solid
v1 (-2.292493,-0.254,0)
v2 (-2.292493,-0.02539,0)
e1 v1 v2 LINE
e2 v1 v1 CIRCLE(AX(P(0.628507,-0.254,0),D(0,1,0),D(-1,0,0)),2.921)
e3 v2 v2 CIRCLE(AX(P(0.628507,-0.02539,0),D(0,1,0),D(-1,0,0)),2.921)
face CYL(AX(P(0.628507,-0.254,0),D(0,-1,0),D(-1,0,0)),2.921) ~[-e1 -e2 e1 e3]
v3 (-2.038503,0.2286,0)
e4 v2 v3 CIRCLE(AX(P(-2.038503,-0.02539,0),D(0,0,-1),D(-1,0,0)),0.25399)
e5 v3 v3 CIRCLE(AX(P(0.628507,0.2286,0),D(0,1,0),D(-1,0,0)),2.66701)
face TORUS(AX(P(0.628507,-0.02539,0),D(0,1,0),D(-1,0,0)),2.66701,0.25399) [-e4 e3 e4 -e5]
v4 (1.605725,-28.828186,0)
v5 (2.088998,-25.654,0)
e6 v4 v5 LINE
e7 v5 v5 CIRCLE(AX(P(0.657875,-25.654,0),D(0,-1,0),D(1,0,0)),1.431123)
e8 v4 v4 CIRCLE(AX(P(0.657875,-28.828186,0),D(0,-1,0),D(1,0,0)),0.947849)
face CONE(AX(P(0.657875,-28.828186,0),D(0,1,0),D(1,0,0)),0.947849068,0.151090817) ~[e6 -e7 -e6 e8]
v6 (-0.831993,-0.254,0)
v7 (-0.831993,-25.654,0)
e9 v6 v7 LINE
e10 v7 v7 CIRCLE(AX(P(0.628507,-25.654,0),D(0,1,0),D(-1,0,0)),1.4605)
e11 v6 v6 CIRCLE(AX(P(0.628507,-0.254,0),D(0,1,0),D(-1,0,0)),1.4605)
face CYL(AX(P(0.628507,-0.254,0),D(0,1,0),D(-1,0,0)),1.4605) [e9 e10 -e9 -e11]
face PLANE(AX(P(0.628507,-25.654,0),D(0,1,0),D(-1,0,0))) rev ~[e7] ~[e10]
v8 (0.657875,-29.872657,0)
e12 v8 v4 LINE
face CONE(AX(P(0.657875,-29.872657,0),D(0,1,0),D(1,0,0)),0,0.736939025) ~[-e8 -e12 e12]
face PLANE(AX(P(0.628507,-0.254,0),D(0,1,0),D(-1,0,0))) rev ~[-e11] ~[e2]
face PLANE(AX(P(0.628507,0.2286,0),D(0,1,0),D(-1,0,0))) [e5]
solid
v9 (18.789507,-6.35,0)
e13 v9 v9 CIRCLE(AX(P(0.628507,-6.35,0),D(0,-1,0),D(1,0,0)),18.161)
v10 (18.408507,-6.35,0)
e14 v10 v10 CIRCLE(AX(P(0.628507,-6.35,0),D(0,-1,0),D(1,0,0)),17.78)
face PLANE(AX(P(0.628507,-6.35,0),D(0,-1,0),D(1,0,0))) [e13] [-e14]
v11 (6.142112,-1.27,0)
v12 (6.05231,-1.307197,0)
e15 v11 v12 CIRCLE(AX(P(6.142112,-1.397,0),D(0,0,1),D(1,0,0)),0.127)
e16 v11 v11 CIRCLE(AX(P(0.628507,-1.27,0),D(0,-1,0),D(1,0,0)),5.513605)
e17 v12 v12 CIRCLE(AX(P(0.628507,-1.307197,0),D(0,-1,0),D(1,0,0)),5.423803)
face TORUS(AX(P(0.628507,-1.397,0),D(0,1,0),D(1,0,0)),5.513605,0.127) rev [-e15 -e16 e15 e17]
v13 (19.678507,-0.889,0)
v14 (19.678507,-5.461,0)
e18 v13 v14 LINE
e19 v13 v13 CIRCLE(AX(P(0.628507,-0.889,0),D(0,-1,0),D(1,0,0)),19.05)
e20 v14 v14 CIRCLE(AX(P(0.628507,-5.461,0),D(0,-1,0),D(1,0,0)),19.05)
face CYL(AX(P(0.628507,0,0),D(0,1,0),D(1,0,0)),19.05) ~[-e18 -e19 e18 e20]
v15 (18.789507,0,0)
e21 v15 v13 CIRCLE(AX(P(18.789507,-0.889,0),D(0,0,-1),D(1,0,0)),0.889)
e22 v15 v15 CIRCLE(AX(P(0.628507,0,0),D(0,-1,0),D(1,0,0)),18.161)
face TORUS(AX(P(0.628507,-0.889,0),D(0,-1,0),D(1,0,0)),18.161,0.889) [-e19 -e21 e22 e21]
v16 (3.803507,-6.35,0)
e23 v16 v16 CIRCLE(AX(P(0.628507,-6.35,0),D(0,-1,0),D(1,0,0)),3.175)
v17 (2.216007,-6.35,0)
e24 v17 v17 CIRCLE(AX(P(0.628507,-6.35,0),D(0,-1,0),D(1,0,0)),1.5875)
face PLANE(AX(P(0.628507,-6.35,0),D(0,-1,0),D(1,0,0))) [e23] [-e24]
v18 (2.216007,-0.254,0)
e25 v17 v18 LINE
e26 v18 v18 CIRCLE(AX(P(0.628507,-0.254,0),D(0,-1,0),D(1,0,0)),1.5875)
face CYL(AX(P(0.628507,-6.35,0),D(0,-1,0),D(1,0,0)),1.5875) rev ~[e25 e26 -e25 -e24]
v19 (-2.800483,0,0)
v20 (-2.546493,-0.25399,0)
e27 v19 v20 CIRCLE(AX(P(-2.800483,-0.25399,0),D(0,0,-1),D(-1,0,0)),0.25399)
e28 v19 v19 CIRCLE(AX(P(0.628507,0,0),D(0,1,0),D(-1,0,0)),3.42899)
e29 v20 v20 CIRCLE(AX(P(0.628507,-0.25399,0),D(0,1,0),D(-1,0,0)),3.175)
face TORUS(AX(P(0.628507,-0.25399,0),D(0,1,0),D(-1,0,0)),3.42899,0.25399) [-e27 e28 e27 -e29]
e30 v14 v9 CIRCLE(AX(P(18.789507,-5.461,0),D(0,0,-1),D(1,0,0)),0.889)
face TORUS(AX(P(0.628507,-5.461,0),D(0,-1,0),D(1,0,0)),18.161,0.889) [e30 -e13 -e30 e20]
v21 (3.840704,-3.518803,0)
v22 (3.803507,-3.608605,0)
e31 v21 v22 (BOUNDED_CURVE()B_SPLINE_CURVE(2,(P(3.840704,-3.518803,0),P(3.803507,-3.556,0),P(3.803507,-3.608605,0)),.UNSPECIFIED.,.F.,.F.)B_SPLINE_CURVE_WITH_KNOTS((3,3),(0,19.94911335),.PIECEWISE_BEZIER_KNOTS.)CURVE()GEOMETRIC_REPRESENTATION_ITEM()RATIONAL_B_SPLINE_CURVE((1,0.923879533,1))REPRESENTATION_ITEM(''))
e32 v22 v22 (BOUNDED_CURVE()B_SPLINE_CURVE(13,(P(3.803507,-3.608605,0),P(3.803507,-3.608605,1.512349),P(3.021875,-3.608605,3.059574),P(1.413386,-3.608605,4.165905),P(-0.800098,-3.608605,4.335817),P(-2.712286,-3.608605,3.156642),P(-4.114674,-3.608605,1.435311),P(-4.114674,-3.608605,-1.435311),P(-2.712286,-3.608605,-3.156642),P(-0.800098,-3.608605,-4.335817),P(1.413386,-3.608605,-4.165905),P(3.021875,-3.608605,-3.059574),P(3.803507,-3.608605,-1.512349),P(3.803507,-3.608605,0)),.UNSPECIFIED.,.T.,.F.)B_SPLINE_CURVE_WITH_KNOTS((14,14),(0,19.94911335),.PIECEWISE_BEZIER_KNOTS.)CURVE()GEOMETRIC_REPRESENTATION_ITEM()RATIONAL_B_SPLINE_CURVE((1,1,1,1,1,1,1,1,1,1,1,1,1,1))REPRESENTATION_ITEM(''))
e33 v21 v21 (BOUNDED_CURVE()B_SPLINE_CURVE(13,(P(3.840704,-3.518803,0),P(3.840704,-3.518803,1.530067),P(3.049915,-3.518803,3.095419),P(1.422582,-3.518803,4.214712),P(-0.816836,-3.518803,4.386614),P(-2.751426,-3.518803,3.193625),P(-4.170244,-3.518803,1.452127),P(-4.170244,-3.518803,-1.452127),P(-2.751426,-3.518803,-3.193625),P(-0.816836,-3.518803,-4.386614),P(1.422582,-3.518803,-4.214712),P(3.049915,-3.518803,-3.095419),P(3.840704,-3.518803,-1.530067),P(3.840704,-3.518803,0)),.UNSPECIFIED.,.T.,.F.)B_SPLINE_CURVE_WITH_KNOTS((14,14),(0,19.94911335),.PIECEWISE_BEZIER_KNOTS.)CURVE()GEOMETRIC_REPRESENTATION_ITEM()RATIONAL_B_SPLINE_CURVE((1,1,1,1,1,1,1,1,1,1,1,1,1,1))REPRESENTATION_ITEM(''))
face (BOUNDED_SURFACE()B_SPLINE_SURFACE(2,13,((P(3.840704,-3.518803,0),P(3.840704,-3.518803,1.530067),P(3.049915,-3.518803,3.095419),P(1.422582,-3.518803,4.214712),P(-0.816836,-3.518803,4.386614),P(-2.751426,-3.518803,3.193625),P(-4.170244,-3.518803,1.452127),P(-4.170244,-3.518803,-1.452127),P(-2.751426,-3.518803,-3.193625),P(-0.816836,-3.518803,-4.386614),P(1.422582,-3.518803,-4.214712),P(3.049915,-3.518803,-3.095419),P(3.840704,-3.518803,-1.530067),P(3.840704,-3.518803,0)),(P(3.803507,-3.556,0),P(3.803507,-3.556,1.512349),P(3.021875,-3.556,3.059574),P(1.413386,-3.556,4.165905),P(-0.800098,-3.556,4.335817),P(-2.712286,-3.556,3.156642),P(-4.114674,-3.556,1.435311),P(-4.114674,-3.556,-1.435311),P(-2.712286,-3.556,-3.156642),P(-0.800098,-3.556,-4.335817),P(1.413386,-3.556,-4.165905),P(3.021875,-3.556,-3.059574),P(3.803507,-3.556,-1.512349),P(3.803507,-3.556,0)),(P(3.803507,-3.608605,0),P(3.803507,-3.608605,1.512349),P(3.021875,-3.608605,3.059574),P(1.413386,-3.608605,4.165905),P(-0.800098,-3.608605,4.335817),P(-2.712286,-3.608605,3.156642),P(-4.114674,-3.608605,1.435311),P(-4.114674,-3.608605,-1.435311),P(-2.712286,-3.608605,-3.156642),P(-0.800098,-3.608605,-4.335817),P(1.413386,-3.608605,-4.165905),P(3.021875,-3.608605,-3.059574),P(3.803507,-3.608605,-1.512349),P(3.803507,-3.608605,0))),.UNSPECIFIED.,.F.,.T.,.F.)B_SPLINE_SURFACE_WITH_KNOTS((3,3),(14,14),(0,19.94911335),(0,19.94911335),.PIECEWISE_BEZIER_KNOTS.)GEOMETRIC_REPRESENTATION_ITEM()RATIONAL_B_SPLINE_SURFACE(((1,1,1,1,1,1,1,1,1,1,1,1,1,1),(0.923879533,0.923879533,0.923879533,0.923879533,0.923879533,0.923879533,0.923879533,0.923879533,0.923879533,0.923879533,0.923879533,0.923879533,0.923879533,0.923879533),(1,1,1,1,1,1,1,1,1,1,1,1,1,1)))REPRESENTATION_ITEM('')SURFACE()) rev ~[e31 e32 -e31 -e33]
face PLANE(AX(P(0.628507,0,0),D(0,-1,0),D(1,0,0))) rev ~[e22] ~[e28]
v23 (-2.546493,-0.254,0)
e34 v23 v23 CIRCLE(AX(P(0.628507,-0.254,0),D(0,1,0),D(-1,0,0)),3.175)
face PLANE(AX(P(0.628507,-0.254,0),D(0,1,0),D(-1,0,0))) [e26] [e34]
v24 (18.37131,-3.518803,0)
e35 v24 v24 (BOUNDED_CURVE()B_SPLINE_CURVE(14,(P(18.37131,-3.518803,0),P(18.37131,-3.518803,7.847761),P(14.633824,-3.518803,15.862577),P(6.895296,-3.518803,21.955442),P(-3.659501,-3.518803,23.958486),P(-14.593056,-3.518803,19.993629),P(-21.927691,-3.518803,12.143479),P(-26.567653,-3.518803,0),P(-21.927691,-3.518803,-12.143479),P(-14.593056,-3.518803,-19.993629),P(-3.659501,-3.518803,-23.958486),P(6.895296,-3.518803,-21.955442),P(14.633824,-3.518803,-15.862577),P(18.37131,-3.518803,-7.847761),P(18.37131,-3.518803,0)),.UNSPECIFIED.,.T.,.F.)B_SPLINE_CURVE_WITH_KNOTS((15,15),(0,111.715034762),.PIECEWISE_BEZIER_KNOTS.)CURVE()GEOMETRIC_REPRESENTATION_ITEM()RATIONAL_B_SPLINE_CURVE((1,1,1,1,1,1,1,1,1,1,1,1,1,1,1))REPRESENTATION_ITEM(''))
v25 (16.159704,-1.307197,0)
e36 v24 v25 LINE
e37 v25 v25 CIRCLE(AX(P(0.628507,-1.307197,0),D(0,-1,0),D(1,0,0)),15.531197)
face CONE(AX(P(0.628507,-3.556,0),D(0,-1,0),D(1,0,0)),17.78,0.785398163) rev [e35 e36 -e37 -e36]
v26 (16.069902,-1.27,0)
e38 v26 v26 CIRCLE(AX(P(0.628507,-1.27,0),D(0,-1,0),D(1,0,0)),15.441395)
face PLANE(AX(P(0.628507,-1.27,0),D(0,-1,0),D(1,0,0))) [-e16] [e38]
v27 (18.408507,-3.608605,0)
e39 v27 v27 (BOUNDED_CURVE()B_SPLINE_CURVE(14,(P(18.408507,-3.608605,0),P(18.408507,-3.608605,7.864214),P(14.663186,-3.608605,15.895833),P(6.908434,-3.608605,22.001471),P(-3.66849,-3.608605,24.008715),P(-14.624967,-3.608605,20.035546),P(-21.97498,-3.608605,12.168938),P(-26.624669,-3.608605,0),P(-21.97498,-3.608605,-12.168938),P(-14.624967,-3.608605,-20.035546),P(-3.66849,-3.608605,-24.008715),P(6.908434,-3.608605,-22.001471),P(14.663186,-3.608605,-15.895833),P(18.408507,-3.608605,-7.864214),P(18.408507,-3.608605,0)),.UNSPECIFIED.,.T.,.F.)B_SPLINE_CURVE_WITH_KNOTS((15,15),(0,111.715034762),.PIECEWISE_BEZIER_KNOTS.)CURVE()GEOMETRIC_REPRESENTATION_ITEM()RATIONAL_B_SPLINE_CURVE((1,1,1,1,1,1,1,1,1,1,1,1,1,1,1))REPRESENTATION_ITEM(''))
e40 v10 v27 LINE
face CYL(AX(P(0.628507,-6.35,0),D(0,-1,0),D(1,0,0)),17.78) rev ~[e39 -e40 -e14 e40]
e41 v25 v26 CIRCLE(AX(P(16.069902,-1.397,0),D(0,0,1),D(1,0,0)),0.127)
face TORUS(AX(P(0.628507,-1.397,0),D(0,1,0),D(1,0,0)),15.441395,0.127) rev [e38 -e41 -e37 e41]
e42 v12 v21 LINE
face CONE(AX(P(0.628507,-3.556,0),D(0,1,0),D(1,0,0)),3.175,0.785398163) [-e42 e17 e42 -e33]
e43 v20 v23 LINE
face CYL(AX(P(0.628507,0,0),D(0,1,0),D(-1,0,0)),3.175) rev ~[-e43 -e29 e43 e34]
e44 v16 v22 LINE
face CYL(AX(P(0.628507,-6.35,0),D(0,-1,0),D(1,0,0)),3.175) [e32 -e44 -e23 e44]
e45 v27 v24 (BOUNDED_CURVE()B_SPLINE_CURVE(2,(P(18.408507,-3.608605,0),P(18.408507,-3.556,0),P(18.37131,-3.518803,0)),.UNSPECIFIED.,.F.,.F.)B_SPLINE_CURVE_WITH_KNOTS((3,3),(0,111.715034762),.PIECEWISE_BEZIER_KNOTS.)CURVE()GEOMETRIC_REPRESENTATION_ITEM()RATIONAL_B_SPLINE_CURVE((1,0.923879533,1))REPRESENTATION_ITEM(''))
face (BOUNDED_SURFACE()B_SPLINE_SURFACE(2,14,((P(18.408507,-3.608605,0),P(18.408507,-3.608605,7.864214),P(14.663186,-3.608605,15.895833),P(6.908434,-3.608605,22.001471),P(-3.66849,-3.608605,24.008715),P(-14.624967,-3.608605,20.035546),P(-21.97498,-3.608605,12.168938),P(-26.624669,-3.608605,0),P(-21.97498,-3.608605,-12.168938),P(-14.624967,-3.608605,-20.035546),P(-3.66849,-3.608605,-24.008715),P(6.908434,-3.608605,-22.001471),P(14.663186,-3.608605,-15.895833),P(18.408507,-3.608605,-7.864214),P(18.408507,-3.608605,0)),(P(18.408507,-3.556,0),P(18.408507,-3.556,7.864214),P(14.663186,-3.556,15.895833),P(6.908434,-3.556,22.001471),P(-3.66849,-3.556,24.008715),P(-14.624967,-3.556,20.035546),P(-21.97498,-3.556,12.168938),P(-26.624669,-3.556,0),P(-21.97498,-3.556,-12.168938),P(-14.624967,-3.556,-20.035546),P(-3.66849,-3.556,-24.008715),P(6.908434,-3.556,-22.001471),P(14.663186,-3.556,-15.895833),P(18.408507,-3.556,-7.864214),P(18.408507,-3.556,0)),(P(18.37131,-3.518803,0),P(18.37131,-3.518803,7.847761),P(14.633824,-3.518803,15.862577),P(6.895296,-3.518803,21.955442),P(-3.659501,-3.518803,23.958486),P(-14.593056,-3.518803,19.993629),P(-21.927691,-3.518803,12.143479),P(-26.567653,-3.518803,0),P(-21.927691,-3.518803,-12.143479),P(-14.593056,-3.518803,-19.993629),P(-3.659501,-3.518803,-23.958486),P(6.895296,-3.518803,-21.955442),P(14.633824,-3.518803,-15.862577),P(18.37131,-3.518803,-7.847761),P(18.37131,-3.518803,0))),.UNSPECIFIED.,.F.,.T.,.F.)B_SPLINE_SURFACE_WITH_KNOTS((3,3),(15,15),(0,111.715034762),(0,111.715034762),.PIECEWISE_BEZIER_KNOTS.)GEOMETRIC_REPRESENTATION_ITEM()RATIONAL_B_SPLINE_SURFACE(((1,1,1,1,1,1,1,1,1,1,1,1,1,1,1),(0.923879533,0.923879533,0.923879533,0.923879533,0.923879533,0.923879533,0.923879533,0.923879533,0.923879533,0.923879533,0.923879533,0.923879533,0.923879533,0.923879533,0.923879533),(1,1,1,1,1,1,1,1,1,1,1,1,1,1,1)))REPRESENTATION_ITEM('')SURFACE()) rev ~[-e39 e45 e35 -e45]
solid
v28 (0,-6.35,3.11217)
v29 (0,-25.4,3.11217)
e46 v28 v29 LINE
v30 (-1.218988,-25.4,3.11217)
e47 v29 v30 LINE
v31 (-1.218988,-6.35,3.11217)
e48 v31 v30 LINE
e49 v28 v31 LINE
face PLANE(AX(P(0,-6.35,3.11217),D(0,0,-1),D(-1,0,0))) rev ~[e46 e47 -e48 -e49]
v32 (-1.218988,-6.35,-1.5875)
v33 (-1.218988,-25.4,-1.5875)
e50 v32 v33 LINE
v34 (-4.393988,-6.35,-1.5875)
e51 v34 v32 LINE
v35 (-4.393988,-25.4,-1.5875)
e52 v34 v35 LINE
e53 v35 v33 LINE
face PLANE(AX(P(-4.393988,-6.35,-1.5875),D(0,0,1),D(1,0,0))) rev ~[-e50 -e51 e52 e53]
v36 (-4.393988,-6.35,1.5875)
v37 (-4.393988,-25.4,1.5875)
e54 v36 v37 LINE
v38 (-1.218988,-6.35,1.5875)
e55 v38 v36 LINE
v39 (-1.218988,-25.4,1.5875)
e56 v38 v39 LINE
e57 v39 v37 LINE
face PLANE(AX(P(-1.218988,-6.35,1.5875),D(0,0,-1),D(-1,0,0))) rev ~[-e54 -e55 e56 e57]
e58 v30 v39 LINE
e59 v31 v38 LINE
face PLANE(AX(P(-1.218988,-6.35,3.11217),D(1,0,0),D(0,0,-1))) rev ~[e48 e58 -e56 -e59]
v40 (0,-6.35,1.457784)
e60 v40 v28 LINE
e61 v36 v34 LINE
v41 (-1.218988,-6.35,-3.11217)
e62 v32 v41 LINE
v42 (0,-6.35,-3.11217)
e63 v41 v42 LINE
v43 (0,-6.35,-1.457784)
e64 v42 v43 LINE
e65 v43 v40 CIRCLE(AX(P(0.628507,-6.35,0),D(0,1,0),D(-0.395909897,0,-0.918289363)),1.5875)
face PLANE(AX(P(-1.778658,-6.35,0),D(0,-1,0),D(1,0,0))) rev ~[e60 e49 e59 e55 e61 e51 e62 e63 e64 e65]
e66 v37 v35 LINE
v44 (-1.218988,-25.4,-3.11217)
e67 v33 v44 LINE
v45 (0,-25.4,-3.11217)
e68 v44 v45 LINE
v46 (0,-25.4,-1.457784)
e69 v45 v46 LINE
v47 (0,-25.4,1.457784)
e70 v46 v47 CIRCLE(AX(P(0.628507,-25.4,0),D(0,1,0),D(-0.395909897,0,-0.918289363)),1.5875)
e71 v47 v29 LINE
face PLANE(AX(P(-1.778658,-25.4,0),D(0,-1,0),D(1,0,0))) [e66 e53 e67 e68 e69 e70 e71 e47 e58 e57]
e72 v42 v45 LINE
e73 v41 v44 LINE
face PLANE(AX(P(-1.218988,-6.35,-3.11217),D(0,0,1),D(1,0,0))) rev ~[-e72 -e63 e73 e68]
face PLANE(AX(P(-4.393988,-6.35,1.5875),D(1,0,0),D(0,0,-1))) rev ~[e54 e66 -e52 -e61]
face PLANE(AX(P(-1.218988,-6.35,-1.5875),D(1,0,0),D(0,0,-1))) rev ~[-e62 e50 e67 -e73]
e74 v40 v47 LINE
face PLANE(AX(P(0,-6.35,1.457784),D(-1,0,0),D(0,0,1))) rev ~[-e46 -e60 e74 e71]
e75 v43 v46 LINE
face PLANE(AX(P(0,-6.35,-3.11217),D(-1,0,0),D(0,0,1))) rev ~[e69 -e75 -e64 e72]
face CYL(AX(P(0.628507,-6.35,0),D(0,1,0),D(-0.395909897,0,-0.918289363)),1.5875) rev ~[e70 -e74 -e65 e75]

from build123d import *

# Parameters (mm, degrees)
F0_R      = 19.05
F1_DEPTH  = 6.35
F2_R      = 17.78
F2_R_2    = 3.175
F3_DEPTH  = 5.08
F4_R      = 1.5875
F5_DEPTH  = 6.35
F6_R      = 3.175
F7_DEPTH  = 0.254
F8_R      = 1.4605
F9_DEPTH  = 25.4
F12_R     = 2.921
F13_DEPTH = 0.4826
F14_R     = 0.25399
F14_2_R   = 0.25399
F15_R     = 0.889
F16_SIZE  = 2.286
F17_R     = 0.127
F19_DEPTH = 19.05


# Not quite as in the source:
# - a fillet or chamfer is up to 0.001 mm smaller than in the source, because OpenCascade refuses the exact size


with BuildPart() as f1:
    # F0 (on Front) → F1 (new body)
    with BuildSketch(Plane.XZ):
        with Locations((0.6285069608, 0)):
            Circle(F0_R)
    extrude(amount=F1_DEPTH)

    # F2 (on face) → F3 (cut)
    with BuildSketch(Plane.XZ.offset(6.35)):
        with Locations((0.6285069608, 0)):
            Circle(F2_R)
        with Locations((0.6285069608, 0)):
            Circle(F2_R_2, mode=Mode.SUBTRACT)
    extrude(amount=-F3_DEPTH, mode=Mode.SUBTRACT)

    # F4 (on face) → F5 (cut, through all)
    with BuildSketch(Plane.XZ.offset(6.35)):
        with Locations((0.6285069608, 0)):
            Circle(F4_R)
    extrude(amount=-F5_DEPTH, mode=Mode.SUBTRACT)

    # F6 (on face) → F7 (cut)
    with BuildSketch(Plane(origin=(0, 0, 0), x_dir=(-1, 0, 0), z_dir=(0, 1, 0))):
        with Locations((-0.6285069608, 0)):
            Circle(F6_R)
    extrude(amount=-F7_DEPTH, mode=Mode.SUBTRACT)

    # F14 (radius 0.254 in the source; OpenCascade refuses exactly that, so slightly less here)
    f14_edges = [f1.edges().sort_by_distance(p)[0] for p in [
        (3.803507, 0, 0),
    ]]
    fillet(f14_edges, radius=F14_R)

    # F15
    f15_edges = [f1.edges().sort_by_distance(p)[0] for p in [
        (-18.421493, 0, 0),
        (-18.421493, -6.35, 0),
    ]]
    fillet(f15_edges, radius=F15_R)

    # F16
    f16_edges = [f1.edges().sort_by_distance(p)[0] for p in [
        (-17.151493, -1.27, 0),
        (-2.546493, -1.27, 0),
    ]]
    chamfer(f16_edges, length=F16_SIZE)

    # F17
    f17_edges = [f1.edges().sort_by_distance(p)[0] for p in [
        (-14.865493, -1.27, 0),
        (-4.832493, -1.27, 0),
        (-2.546493, -3.556, 0),
        (-17.151493, -3.556, 0),
    ]]
    fillet(f17_edges, radius=F17_R)


with BuildPart() as f9:
    # F8 (on face) → F9 (new body)
    with BuildSketch(Plane(origin=(0, -0.254, 0), x_dir=(-1, 0, 0), z_dir=(0, 1, 0))):
        with Locations((-0.6285069608, 0)):
            Circle(F8_R)
    extrude(amount=-F9_DEPTH)

    # F10 (on Top) → F11 (revolve)
    with BuildSketch(Plane.XY):
        Polygon((2.0889979787, -25.654), (0.6578754546, -25.654), (0.6578754546, -29.8726570247), (1.605724523, -28.8281862079), align=None)
    revolve(axis=Axis((0.6578754546, -27.7633285124, 0), (0, -1, 0)))

    # F12 (on face) → F13 (join)
    with BuildSketch(Plane(origin=(0, -0.254, 0), x_dir=(-1, 0, 0), z_dir=(0, 1, 0))):
        with Locations((-0.6285069608, 0)):
            Circle(F12_R)
    extrude(amount=F13_DEPTH)

    # F14#2 (radius 0.254 in the source; OpenCascade refuses exactly that, so slightly less here)
    f14_2_edges = [f9.edges().sort_by_distance(p)[0] for p in [
        (3.549507, 0.2286, 0),
    ]]
    fillet(f14_2_edges, radius=F14_2_R)


with BuildPart() as f19:
    # F18 (on face) → F19 (new body)
    with BuildSketch(Plane.XZ.offset(6.35)):
        with BuildLine():
            Line((0, 1.4577843634), (0, 3.1121703039))
            Line((0, 3.1121703039), (-1.2189875124, 3.1121703039))
            Line((-1.2189875124, 3.1121703039), (-1.2189875124, 1.5875))
            Line((-1.2189875124, 1.5875), (-4.3939875124, 1.5875))
            Line((-4.3939875124, 1.5875), (-4.3939875124, -1.5875))
            Line((-4.3939875124, -1.5875), (-1.2189875124, -1.5875))
            Line((-1.2189875124, -1.5875), (-1.2189875124, -3.1121703039))
            Line((-1.2189875124, -3.1121703039), (0, -3.1121703039))
            Line((0, -3.1121703039), (0, -1.4577843634))
            ThreePointArc((0, -1.4577843634), (-0.9589930392, 0), (0, 1.4577843634))
        make_face()
    extrude(amount=F19_DEPTH)


solid = Compound([f1.part, f9.part, f19.part])
